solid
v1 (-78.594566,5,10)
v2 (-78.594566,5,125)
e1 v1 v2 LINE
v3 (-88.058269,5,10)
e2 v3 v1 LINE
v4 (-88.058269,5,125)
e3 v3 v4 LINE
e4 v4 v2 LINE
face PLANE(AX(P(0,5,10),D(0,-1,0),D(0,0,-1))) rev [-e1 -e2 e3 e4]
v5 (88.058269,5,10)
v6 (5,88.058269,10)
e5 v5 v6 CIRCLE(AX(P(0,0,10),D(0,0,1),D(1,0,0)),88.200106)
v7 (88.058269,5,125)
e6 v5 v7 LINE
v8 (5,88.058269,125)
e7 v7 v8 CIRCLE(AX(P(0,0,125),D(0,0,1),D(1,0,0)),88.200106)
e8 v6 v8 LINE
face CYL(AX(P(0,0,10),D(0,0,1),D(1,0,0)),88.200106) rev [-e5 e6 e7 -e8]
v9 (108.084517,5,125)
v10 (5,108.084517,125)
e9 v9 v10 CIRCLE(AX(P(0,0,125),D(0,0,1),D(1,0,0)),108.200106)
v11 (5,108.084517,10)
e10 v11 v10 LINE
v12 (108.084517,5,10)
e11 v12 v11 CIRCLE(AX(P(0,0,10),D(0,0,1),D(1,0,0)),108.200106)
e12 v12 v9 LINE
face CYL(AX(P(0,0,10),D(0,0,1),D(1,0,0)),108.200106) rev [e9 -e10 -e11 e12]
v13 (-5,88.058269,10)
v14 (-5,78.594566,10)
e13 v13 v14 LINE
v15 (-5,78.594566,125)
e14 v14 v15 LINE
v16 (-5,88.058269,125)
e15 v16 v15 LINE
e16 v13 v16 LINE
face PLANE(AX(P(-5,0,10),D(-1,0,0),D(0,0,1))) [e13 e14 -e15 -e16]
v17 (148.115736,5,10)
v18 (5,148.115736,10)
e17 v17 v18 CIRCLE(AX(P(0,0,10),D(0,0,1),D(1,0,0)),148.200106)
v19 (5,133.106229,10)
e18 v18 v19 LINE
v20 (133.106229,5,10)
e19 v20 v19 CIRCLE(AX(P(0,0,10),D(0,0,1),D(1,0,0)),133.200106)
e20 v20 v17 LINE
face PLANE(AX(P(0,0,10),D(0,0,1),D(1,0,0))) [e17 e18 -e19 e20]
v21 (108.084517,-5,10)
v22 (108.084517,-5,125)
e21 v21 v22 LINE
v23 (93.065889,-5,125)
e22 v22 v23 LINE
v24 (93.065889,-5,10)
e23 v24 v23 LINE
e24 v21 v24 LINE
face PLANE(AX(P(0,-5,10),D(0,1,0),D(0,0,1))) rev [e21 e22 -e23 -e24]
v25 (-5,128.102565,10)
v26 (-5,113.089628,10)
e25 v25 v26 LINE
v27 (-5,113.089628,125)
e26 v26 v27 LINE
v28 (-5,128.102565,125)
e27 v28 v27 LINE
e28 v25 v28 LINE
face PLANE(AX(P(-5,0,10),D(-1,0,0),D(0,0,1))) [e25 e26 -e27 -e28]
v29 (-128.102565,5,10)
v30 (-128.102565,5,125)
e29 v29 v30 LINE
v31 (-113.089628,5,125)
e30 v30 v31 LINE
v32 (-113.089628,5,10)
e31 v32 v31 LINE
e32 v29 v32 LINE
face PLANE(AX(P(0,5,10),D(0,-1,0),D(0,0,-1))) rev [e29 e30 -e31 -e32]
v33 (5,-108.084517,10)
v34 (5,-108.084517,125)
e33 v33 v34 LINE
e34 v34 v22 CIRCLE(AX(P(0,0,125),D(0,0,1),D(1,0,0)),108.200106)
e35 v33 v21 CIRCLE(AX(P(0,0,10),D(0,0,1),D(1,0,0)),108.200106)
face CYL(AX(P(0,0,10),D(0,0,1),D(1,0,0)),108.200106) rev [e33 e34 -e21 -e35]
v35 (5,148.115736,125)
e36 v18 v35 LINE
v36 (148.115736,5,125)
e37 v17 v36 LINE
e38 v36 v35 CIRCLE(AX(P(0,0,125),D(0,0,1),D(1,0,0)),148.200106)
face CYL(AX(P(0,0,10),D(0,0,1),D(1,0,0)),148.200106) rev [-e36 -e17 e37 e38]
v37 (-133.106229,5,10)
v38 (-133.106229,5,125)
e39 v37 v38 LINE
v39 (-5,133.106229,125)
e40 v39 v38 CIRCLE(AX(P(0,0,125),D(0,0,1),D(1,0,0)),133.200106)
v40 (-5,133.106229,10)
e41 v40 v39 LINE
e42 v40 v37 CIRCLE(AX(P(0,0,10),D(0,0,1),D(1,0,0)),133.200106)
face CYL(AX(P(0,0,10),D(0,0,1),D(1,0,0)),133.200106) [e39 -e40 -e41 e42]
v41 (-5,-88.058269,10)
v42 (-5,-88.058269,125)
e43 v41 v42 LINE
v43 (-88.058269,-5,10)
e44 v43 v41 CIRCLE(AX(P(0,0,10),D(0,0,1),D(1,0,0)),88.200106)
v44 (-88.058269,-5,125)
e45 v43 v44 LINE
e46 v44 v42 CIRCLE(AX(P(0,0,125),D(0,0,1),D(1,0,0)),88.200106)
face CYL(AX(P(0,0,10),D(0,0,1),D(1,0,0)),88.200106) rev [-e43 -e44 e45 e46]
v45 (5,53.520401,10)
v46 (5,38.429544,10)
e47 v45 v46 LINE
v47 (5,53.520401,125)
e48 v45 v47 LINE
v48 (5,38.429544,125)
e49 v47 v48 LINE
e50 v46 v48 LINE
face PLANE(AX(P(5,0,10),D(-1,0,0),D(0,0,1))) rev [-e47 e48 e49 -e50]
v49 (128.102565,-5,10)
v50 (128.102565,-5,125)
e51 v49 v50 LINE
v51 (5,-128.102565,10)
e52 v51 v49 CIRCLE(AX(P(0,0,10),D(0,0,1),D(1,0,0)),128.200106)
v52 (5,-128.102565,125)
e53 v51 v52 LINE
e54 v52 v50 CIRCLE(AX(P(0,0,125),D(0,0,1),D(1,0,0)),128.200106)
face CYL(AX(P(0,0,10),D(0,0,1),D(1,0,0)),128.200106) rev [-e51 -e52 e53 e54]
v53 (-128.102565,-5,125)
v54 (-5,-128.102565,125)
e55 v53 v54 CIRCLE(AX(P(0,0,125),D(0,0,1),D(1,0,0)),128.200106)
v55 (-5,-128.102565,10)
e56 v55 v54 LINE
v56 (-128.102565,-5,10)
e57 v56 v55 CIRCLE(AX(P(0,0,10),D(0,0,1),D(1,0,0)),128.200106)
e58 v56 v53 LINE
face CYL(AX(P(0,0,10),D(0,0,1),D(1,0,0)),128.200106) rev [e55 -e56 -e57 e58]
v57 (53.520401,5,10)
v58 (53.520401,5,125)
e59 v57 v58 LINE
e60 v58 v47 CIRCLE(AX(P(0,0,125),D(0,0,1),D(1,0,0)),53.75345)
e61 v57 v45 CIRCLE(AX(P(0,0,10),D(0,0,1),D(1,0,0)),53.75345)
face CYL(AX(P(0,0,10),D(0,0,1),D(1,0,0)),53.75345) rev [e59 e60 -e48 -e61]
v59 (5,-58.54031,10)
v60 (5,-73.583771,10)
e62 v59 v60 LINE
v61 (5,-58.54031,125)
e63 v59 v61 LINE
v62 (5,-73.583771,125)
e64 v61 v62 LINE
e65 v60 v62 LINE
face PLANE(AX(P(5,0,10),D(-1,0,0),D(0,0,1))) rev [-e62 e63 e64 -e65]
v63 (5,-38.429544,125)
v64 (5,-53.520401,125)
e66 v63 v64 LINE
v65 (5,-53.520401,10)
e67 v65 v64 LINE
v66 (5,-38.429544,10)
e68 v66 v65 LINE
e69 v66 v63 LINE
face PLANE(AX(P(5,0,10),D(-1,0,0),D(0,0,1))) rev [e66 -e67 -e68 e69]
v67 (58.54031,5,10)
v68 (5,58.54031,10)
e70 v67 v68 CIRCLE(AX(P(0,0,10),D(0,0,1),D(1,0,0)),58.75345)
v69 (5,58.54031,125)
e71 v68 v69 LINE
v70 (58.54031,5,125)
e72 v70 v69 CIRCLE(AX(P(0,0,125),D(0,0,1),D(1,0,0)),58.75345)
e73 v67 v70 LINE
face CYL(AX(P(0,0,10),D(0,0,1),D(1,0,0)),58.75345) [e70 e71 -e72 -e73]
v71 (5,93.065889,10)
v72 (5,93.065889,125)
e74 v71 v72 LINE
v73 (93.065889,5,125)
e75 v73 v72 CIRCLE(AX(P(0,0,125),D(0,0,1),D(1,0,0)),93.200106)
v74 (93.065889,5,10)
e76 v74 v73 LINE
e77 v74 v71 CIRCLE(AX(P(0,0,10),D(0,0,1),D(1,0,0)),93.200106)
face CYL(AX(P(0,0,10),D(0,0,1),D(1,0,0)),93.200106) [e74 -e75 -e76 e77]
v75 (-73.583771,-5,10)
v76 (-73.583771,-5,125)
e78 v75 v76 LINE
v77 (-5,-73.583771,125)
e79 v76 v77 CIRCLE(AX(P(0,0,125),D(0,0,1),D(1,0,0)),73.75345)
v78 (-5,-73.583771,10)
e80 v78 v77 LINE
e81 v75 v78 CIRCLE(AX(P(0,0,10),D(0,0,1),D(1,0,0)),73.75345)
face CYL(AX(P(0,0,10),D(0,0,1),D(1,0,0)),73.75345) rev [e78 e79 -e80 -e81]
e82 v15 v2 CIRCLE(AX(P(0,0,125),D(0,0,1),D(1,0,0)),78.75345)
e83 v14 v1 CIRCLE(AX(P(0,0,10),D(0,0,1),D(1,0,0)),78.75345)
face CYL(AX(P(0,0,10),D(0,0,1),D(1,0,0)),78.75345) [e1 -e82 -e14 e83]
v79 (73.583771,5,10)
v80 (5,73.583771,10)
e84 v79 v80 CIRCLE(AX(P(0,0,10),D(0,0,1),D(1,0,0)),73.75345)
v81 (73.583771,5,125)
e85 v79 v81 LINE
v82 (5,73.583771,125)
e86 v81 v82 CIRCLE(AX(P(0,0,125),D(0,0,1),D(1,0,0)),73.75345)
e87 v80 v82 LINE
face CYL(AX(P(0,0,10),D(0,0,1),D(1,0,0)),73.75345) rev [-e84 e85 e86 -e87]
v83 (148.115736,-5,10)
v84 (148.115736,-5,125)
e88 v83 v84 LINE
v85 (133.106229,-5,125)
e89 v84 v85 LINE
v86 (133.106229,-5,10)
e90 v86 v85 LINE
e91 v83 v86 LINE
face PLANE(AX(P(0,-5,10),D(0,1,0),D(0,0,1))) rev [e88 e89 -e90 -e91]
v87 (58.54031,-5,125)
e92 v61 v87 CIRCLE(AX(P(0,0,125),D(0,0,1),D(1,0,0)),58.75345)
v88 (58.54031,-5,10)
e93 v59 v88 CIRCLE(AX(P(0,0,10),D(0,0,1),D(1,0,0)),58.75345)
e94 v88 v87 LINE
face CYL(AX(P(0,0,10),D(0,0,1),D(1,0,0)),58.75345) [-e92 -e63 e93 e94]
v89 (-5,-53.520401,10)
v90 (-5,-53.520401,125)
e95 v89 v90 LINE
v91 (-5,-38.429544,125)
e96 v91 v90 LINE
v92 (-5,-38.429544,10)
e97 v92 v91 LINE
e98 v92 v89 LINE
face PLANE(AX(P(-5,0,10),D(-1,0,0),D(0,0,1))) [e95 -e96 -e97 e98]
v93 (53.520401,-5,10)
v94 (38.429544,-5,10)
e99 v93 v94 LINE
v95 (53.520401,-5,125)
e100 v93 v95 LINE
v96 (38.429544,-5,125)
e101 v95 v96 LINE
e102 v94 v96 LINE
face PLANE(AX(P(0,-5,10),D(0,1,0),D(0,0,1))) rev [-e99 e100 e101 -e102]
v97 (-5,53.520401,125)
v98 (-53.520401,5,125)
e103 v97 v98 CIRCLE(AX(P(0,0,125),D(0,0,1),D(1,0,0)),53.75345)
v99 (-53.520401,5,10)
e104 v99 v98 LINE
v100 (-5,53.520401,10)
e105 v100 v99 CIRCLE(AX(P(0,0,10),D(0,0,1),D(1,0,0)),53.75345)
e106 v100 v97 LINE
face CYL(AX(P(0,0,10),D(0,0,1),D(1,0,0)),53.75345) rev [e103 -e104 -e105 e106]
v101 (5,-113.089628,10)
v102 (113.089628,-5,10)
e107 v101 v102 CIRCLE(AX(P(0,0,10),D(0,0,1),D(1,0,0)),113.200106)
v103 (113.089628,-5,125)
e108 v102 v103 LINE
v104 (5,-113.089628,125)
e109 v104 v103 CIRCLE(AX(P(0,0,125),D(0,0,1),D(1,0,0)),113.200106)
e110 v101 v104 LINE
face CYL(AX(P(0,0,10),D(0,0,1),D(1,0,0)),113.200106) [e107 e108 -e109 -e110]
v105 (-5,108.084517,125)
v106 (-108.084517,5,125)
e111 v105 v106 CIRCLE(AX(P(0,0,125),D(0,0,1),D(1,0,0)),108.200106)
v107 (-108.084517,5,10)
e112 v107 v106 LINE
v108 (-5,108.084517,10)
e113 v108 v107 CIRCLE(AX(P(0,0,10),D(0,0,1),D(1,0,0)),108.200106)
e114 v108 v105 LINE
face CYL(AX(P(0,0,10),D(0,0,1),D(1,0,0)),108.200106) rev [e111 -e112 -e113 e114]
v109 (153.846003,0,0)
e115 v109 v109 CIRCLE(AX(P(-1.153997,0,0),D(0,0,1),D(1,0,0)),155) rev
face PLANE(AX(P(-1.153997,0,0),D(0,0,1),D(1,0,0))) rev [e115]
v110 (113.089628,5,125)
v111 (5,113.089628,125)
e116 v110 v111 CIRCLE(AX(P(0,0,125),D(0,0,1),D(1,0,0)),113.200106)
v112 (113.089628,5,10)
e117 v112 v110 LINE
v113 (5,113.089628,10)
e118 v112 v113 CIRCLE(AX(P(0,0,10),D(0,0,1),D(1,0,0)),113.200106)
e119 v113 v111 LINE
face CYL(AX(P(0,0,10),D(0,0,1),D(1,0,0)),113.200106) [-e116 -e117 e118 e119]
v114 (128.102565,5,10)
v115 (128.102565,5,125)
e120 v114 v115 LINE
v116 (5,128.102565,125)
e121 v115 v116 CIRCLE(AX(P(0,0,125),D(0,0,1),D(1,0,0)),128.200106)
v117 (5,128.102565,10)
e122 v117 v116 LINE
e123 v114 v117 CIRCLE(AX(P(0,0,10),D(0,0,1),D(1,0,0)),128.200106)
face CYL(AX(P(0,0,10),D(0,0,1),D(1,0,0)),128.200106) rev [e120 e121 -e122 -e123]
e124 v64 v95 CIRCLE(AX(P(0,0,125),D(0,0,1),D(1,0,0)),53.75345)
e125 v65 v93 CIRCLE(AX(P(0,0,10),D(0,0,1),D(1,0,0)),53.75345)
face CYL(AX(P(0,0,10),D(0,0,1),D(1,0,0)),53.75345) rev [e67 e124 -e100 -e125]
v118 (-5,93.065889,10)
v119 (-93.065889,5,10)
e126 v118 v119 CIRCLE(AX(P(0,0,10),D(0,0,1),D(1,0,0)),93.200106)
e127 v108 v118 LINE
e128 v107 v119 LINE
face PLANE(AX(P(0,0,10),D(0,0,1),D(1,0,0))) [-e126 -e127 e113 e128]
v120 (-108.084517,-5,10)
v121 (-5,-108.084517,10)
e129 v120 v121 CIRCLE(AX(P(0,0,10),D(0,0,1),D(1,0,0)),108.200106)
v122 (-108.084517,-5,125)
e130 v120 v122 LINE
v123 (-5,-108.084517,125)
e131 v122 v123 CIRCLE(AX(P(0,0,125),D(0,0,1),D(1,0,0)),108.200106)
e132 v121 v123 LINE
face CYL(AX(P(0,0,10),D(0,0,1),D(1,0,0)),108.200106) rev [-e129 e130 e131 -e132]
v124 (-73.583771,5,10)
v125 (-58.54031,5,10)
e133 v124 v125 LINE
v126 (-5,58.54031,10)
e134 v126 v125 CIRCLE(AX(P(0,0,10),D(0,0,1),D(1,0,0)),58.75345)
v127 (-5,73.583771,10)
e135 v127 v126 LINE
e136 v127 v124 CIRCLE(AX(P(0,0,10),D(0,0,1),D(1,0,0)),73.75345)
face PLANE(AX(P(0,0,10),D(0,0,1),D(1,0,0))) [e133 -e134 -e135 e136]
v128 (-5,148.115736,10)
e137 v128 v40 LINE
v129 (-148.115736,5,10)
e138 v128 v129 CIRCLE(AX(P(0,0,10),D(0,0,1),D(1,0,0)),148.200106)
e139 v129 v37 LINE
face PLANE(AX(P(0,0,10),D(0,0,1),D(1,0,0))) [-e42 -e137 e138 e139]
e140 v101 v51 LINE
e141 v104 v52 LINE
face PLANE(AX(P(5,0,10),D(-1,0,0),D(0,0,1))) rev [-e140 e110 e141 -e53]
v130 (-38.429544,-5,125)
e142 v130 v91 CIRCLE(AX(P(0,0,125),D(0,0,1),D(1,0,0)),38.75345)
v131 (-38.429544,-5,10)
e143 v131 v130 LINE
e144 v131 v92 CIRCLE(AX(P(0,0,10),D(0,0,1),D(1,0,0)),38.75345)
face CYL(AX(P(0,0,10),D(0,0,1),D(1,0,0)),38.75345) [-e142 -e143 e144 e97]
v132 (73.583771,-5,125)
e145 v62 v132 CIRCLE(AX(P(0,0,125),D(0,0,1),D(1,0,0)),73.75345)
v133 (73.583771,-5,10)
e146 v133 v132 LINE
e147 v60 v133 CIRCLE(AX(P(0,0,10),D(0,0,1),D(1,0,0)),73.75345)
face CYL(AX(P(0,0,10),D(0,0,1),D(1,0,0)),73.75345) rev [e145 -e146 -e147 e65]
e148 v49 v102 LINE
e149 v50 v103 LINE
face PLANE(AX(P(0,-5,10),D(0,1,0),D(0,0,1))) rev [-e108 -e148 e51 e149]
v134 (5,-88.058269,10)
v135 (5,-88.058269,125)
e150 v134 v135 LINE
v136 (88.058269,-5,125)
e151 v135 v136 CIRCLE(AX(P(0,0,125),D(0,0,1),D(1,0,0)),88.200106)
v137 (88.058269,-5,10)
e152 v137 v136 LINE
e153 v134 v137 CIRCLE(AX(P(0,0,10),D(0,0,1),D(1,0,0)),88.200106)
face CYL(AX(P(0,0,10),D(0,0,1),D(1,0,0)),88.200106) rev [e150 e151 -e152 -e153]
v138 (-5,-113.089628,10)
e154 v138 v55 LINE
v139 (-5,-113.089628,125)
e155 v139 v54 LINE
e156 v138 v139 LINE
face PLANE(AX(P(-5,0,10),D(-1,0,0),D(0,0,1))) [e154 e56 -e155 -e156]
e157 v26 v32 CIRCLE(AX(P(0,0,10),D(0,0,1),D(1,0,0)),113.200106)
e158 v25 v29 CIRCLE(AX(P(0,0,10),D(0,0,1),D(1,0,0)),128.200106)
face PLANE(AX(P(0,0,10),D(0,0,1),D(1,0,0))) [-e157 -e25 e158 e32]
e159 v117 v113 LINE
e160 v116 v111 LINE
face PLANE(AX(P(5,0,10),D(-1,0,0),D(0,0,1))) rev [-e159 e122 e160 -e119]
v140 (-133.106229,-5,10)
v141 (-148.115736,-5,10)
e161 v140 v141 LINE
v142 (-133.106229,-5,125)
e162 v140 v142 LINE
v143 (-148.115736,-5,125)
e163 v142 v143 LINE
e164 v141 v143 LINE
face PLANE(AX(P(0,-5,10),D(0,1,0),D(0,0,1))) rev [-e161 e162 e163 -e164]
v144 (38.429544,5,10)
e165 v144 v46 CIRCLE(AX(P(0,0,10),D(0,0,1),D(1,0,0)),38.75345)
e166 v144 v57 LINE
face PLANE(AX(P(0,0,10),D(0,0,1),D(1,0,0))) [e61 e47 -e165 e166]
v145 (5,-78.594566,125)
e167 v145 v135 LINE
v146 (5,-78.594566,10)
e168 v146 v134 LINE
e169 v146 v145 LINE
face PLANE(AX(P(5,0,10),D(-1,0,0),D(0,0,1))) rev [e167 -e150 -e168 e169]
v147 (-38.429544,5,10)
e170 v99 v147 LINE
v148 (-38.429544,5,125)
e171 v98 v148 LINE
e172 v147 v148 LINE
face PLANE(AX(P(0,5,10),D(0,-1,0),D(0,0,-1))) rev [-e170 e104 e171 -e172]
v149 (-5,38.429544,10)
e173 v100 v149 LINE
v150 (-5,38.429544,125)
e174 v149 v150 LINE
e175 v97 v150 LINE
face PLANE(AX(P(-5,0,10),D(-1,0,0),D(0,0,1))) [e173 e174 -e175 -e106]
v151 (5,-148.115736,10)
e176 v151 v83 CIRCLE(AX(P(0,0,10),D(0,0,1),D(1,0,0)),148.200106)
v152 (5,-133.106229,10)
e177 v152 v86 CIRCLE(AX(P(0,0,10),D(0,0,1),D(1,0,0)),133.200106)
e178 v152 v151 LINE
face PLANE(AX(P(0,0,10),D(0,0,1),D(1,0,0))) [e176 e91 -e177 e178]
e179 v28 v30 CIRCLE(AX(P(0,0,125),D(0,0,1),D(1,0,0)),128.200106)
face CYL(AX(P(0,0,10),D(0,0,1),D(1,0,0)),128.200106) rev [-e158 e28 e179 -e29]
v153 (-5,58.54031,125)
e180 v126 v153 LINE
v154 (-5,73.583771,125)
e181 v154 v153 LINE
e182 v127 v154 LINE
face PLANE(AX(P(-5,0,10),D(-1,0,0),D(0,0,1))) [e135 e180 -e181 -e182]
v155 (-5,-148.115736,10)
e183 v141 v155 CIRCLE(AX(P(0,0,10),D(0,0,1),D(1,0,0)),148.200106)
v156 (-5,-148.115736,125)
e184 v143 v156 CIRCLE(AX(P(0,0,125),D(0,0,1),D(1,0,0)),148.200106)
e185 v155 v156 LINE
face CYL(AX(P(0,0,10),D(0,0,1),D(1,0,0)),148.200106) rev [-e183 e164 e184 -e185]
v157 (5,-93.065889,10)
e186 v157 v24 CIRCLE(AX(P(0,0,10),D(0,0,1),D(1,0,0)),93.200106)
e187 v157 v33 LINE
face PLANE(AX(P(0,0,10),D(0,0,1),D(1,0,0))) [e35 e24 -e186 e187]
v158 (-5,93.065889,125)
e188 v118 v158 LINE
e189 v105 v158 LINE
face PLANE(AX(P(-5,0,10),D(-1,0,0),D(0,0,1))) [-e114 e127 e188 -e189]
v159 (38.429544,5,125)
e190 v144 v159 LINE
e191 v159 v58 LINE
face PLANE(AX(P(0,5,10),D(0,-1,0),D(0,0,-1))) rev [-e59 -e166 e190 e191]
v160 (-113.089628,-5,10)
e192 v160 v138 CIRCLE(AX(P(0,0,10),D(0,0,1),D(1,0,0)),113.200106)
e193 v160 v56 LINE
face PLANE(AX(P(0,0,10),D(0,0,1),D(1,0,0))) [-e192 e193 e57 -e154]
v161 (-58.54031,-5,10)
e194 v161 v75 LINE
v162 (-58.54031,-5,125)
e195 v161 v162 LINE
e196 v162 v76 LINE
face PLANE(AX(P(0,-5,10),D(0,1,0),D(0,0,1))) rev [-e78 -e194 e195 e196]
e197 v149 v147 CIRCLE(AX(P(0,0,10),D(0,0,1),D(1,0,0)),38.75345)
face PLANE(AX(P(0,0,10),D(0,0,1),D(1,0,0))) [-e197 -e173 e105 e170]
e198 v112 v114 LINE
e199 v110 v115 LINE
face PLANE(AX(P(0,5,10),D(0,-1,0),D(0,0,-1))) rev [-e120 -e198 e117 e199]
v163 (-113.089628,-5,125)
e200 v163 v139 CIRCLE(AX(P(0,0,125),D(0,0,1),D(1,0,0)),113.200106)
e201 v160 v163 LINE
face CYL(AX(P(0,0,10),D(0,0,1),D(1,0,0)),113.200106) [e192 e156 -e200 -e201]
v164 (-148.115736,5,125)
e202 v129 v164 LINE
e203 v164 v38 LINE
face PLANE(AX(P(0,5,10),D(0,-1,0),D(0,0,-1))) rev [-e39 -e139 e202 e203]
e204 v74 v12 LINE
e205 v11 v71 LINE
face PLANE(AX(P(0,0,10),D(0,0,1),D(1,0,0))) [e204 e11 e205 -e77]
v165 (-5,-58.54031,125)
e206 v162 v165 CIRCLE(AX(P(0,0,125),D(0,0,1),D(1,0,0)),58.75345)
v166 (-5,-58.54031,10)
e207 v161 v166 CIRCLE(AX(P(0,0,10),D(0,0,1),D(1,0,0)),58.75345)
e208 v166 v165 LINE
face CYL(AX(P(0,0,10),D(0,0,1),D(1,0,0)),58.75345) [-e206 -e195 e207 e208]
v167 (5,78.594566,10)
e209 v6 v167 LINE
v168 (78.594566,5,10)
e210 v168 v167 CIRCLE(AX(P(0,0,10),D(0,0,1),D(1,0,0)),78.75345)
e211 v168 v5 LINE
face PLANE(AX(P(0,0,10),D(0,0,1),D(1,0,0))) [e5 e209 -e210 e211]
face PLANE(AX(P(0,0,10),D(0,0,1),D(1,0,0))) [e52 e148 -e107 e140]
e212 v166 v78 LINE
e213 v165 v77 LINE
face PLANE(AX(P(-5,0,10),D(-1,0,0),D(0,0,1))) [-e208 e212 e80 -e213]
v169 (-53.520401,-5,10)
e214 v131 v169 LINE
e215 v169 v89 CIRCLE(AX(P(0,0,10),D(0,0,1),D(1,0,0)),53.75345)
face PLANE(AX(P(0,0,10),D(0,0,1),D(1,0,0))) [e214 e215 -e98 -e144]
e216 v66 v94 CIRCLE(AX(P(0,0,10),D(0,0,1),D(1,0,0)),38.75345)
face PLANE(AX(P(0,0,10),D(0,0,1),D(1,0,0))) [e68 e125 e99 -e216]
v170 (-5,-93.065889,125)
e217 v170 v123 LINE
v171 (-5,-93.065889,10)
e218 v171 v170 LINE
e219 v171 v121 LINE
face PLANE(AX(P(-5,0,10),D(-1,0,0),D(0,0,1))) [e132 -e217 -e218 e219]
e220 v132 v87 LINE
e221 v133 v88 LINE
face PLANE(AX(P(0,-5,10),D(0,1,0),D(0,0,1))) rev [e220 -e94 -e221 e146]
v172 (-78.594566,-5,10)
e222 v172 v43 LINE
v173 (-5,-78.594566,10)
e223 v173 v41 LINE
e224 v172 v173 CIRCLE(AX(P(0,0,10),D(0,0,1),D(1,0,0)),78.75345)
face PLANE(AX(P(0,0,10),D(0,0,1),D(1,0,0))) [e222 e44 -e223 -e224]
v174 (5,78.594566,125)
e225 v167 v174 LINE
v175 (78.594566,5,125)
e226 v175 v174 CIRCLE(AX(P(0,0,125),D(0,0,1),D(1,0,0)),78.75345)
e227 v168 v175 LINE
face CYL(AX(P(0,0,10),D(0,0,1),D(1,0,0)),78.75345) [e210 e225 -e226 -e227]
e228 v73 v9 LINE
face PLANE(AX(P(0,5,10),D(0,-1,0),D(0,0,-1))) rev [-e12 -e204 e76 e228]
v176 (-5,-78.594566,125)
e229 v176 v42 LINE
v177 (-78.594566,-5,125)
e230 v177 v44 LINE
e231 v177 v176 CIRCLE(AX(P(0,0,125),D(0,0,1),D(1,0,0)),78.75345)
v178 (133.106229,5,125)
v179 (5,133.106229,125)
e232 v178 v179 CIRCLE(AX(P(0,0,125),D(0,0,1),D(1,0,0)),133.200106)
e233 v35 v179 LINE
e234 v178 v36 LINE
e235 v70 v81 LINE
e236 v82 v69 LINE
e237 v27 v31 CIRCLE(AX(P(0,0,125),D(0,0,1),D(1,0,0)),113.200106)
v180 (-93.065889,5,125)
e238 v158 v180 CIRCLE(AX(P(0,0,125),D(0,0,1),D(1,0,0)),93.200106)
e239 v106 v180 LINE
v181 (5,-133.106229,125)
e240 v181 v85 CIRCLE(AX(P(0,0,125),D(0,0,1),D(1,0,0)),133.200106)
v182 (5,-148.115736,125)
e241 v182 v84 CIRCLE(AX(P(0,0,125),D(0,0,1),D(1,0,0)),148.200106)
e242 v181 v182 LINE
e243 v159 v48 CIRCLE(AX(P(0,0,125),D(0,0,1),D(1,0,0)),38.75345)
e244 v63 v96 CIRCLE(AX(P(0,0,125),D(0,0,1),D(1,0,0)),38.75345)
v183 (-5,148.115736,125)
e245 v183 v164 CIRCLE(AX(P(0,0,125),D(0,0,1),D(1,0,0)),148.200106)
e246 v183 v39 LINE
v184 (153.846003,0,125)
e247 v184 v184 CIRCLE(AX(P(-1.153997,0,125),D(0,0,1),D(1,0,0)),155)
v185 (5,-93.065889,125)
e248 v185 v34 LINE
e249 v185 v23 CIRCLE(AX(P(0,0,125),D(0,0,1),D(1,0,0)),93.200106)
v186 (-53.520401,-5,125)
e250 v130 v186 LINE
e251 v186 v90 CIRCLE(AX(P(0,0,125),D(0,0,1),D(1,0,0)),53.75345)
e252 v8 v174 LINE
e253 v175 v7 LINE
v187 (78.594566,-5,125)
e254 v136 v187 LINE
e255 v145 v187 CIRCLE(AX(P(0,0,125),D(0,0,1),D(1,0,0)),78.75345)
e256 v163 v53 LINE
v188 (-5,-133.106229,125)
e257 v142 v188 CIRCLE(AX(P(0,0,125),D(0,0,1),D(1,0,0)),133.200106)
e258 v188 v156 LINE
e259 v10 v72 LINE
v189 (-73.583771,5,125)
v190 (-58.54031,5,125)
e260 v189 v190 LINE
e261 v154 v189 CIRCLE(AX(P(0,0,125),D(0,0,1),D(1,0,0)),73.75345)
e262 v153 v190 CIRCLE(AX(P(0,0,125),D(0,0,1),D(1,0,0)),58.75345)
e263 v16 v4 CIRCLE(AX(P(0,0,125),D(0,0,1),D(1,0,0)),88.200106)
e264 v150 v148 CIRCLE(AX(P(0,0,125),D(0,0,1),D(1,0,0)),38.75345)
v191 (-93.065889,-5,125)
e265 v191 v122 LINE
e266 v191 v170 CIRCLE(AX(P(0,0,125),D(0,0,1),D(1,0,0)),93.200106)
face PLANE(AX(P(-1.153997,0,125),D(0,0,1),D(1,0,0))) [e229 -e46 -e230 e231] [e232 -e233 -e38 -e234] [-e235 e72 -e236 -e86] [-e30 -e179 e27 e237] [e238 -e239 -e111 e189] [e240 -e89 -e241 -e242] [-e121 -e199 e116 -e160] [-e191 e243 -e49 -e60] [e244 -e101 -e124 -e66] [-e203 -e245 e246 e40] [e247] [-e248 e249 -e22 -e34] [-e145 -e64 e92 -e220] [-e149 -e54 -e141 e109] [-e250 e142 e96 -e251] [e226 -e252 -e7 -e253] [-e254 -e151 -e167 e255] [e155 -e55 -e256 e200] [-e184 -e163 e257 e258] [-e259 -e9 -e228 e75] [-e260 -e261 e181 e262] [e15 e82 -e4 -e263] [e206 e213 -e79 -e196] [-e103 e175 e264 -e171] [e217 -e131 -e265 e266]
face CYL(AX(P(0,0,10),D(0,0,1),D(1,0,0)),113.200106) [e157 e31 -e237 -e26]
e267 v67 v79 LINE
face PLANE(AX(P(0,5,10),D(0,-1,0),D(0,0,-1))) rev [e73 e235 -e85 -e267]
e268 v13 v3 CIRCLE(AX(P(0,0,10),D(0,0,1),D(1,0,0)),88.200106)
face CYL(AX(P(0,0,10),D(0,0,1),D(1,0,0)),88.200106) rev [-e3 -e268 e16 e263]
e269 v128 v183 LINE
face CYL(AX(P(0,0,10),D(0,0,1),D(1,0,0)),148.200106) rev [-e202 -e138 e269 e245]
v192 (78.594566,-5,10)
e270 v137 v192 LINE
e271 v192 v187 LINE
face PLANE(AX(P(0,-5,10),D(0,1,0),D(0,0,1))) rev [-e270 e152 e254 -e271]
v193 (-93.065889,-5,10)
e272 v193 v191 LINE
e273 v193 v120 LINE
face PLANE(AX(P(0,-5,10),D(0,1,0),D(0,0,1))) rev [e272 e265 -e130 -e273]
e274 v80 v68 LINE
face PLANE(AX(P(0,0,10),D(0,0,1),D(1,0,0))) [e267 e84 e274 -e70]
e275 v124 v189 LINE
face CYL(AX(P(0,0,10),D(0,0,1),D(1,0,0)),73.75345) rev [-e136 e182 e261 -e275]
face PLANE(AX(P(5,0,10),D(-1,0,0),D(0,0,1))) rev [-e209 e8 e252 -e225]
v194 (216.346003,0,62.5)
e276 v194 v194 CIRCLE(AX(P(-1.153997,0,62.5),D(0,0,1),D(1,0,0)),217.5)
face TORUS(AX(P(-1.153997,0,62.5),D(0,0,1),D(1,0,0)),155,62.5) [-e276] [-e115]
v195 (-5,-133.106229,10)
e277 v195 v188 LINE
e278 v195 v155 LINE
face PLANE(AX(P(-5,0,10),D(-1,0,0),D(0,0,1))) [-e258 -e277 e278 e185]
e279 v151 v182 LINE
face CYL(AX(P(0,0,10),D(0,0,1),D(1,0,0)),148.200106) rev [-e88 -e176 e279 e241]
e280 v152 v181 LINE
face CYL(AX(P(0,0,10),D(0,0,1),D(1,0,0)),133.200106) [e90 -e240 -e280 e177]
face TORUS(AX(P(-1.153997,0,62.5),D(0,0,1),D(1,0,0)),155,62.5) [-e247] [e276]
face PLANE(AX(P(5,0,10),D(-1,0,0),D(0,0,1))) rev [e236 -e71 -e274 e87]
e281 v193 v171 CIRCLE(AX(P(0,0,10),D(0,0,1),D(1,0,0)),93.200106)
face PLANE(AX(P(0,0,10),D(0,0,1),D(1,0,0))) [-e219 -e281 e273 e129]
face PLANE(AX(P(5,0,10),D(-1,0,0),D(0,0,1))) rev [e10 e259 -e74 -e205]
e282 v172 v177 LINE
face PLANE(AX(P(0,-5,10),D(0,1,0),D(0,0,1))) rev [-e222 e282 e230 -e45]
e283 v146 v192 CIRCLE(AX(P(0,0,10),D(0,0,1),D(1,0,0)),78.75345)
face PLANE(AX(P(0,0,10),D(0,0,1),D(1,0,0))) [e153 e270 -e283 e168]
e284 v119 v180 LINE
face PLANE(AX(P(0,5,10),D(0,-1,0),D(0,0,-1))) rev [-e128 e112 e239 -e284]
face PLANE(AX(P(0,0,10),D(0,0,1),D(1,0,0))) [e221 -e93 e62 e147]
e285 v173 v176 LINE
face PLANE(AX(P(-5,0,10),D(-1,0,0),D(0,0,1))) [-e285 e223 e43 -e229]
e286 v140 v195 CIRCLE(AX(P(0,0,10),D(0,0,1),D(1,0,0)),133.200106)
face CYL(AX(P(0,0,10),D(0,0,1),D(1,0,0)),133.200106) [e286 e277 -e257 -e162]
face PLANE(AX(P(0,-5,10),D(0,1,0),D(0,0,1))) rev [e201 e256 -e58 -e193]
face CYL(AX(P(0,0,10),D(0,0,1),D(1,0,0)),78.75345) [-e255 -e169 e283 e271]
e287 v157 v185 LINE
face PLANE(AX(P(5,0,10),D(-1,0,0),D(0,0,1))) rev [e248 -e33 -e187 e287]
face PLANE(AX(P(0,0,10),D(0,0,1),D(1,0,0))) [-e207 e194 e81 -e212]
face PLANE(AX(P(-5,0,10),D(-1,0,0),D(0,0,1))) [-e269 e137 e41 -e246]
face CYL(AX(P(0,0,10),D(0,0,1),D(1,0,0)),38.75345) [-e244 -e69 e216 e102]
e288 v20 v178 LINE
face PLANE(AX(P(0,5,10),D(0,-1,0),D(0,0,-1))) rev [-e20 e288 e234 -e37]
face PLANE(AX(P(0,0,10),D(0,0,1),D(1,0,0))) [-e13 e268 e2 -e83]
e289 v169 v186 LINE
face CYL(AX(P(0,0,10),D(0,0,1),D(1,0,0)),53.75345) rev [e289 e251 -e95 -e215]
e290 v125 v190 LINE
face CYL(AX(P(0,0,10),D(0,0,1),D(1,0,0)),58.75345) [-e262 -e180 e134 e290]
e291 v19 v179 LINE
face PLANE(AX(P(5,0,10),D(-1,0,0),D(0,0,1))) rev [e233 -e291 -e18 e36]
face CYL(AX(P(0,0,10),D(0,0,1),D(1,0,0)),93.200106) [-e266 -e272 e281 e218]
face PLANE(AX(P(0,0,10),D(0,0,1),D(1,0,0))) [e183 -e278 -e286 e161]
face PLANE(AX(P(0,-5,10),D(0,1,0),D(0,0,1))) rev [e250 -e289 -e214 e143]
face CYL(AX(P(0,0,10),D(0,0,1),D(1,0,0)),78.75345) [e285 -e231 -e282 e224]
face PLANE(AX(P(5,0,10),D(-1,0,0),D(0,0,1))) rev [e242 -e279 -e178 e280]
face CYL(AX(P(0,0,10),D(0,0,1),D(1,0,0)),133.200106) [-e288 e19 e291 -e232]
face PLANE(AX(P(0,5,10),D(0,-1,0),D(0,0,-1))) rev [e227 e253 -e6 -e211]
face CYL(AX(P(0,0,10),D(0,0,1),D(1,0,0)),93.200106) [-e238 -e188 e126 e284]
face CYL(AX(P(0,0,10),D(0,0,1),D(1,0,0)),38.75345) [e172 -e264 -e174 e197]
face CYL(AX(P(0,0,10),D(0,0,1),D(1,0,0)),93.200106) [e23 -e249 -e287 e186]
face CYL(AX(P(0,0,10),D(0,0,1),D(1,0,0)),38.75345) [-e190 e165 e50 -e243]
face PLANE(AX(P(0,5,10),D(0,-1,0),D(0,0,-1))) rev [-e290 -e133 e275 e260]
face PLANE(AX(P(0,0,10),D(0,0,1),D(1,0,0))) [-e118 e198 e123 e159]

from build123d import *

# Parameters (mm, degrees)
CROQUIS1_R              = 217.5
SALIENTE_EXTRUIR1_DEPTH = 125
REDONDEO2_R             = 62.5
CORTAR_EXTRUIR4_DEPTH   = 115


with BuildPart() as part:
    # Croquis1 → Saliente-Extruir1 (new body)
    with BuildSketch(Plane.XY):
        with Locations((-1.153997035, 0)):
            Circle(CROQUIS1_R)
    extrude(amount=SALIENTE_EXTRUIR1_DEPTH)

    # Redondeo2
    redondeo2_edges = [part.edges().sort_by_distance(p)[0] for p in [
        (-218.653997035, 0, 0),
        (-218.653997035, 0, 125),
    ]]
    fillet(redondeo2_edges, radius=REDONDEO2_R - 0.0001)  # a hair under: the kernel refuses the full size

    # Croquis6 → Cortar-Extruir4 (cut)
    with BuildSketch(Plane.XY.offset(125)):
        with BuildLine():
            ThreePointArc((148.115736426, 5), (104.793299826, 104.793299826), (5, 148.115736426))
            Line((5, 148.115736426), (5, 133.106229009))
            ThreePointArc((5, 133.106229009), (94.186698108, 94.186698108), (133.106229009, 5))
            Line((133.106229009, 5), (148.115736426, 5))
        make_face()
        with BuildLine():
            ThreePointArc((5, -148.115736426), (104.793299826, -104.793299826), (148.115736426, -5))
            Line((148.115736426, -5), (133.106229009, -5))
            ThreePointArc((133.106229009, -5), (94.186698108, -94.186698108), (5, -133.106229009))
            Line((5, -133.106229009), (5, -148.115736426))
        make_face()
        with BuildLine():
            Line((-133.106229009, -5), (-148.115736426, -5))
            ThreePointArc((-148.115736426, -5), (-104.793299826, -104.793299826), (-5, -148.115736426))
            Line((-5, -148.115736426), (-5, -133.106229009))
            ThreePointArc((-5, -133.106229009), (-94.186698108, -94.186698108), (-133.106229009, -5))
        make_face()
        with BuildLine():
            Line((-5, 133.106229009), (-5, 148.115736426))
            ThreePointArc((-5, 148.115736426), (-104.793299826, 104.793299826), (-148.115736426, 5))
            Line((-148.115736426, 5), (-133.106229009, 5))
            ThreePointArc((-133.106229009, 5), (-94.186698108, 94.186698108), (-5, 133.106229009))
        make_face()
        with BuildLine():
            Line((-5, 113.089628024), (-5, 128.102564933))
            ThreePointArc((-5, 128.102564933), (-90.651164202, 90.651164202), (-128.102564933, 5))
            Line((-128.102564933, 5), (-113.089628024, 5))
            ThreePointArc((-113.089628024, 5), (-80.044562485, 80.044562485), (-5, 113.089628024))
        make_face()
        with BuildLine():
            Line((-113.089628024, -5), (-128.102564933, -5))
            ThreePointArc((-128.102564933, -5), (-90.651164202, -90.651164202), (-5, -128.102564933))
            Line((-5, -128.102564933), (-5, -113.089628024))
            ThreePointArc((-5, -113.089628024), (-80.044562485, -80.044562485), (-113.089628024, -5))
        make_face()
        with BuildLine():
            Line((-5, 93.065889198), (-5, 108.08451743))
            ThreePointArc((-5, 108.08451743), (-76.509028579, 76.509028579), (-108.08451743, 5))
            Line((-108.08451743, 5), (-93.065889198, 5))
            ThreePointArc((-93.065889198, 5), (-65.902426861, 65.902426861), (-5, 93.065889198))
        make_face()
        with BuildLine():
            Line((-93.065889198, -5), (-108.08451743, -5))
            ThreePointArc((-108.08451743, -5), (-76.509028579, -76.509028579), (-5, -108.08451743))
            Line((-5, -108.08451743), (-5, -93.065889198))
            ThreePointArc((-5, -93.065889198), (-65.902426861, -65.902426861), (-93.065889198, -5))
        make_face()
        with BuildLine():
            Line((-58.540309792, -5), (-73.58377108, -5))
            ThreePointArc((-73.58377108, -5), (-52.151564532, -52.151564532), (-5, -73.58377108))
            Line((-5, -73.58377108), (-5, -58.540309792))
            ThreePointArc((-5, -58.540309792), (-41.544962815, -41.544962815), (-58.540309792, -5))
        make_face()
        with BuildLine():
            Line((-5, 58.540309792), (-5, 73.58377108))
            ThreePointArc((-5, 73.58377108), (-52.151564532, 52.151564532), (-73.58377108, 5))
            Line((-73.58377108, 5), (-58.540309792, 5))
            ThreePointArc((-58.540309792, 5), (-41.544962815, 41.544962815), (-5, 58.540309792))
        make_face()
        with BuildLine():
            Line((-5, 78.594566383), (-5, 88.058268628))
            ThreePointArc((-5, 88.058268628), (-62.366892955, 62.366892955), (-88.058268628, 5))
            Line((-88.058268628, 5), (-78.594566383, 5))
            ThreePointArc((-78.594566383, 5), (-55.687098438, 55.687098438), (-5, 78.594566383))
        make_face()
        with BuildLine():
            Line((-78.594566383, -5), (-88.058268628, -5))
            ThreePointArc((-88.058268628, -5), (-62.366892955, -62.366892955), (-5, -88.058268628))
            Line((-5, -88.058268628), (-5, -78.594566383))
            ThreePointArc((-5, -78.594566383), (-55.687098438, -55.687098438), (-78.594566383, -5))
        make_face()
        with BuildLine():
            Line((-38.429544313, -5), (-53.520401455, -5))
            ThreePointArc((-53.520401455, -5), (-38.009428909, -38.009428909), (-5, -53.520401455))
            Line((-5, -53.520401455), (-5, -38.429544313))
            ThreePointArc((-5, -38.429544313), (-27.402827191, -27.402827191), (-38.429544313, -5))
        make_face()
        with BuildLine():
            Line((-5, 38.429544313), (-5, 53.520401455))
            ThreePointArc((-5, 53.520401455), (-38.009428909, 38.009428909), (-53.520401455, 5))
            Line((-53.520401455, 5), (-38.429544313, 5))
            ThreePointArc((-38.429544313, 5), (-27.402827191, 27.402827191), (-5, 38.429544313))
        make_face()
        with BuildLine():
            ThreePointArc((5, -53.520401455), (38.009428909, -38.009428909), (53.520401455, -5))
            Line((53.520401455, -5), (38.429544313, -5))
            ThreePointArc((38.429544313, -5), (27.402827191, -27.402827191), (5, -38.429544313))
            Line((5, -38.429544313), (5, -53.520401455))
        make_face()
        with BuildLine():
            ThreePointArc((53.520401455, 5), (38.009428909, 38.009428909), (5, 53.520401455))
            Line((5, 53.520401455), (5, 38.429544313))
            ThreePointArc((5, 38.429544313), (27.402827191, 27.402827191), (38.429544313, 5))
            Line((38.429544313, 5), (53.520401455, 5))
        make_face()
        with BuildLine():
            ThreePointArc((73.58377108, 5), (52.151564532, 52.151564532), (5, 73.58377108))
            Line((5, 73.58377108), (5, 58.540309792))
            ThreePointArc((5, 58.540309792), (41.544962815, 41.544962815), (58.540309792, 5))
            Line((58.540309792, 5), (73.58377108, 5))
        make_face()
        with BuildLine():
            ThreePointArc((88.058268628, 5), (62.366892955, 62.366892955), (5, 88.058268628))
            Line((5, 88.058268628), (5, 78.594566383))
            ThreePointArc((5, 78.594566383), (55.687098438, 55.687098438), (78.594566383, 5))
            Line((78.594566383, 5), (88.058268628, 5))
        make_face()
        with BuildLine():
            ThreePointArc((108.08451743, 5), (76.509028579, 76.509028579), (5, 108.08451743))
            Line((5, 108.08451743), (5, 93.065889198))
            ThreePointArc((5, 93.065889198), (65.902426861, 65.902426861), (93.065889198, 5))
            Line((93.065889198, 5), (108.08451743, 5))
        make_face()
        with BuildLine():
            ThreePointArc((128.102564933, 5), (90.651164202, 90.651164202), (5, 128.102564933))
            Line((5, 128.102564933), (5, 113.089628024))
            ThreePointArc((5, 113.089628024), (80.044562485, 80.044562485), (113.089628024, 5))
            Line((113.089628024, 5), (128.102564933, 5))
        make_face()
        with BuildLine():
            ThreePointArc((5, -128.102564933), (90.651164202, -90.651164202), (128.102564933, -5))
            Line((128.102564933, -5), (113.089628024, -5))
            ThreePointArc((113.089628024, -5), (80.044562485, -80.044562485), (5, -113.089628024))
            Line((5, -113.089628024), (5, -128.102564933))
        make_face()
        with BuildLine():
            ThreePointArc((5, -108.08451743), (76.509028579, -76.509028579), (108.08451743, -5))
            Line((108.08451743, -5), (93.065889198, -5))
            ThreePointArc((93.065889198, -5), (65.902426861, -65.902426861), (5, -93.065889198))
            Line((5, -93.065889198), (5, -108.08451743))
        make_face()
        with BuildLine():
            ThreePointArc((5, -88.058268628), (62.366892955, -62.366892955), (88.058268628, -5))
            Line((88.058268628, -5), (78.594566383, -5))
            ThreePointArc((78.594566383, -5), (55.687098438, -55.687098438), (5, -78.594566383))
            Line((5, -78.594566383), (5, -88.058268628))
        make_face()
        with BuildLine():
            ThreePointArc((5, -73.58377108), (52.151564532, -52.151564532), (73.58377108, -5))
            Line((73.58377108, -5), (58.540309792, -5))
            ThreePointArc((58.540309792, -5), (41.544962815, -41.544962815), (5, -58.540309792))
            Line((5, -58.540309792), (5, -73.58377108))
        make_face()
    extrude(amount=-CORTAR_EXTRUIR4_DEPTH, mode=Mode.SUBTRACT)


solid = part.part
